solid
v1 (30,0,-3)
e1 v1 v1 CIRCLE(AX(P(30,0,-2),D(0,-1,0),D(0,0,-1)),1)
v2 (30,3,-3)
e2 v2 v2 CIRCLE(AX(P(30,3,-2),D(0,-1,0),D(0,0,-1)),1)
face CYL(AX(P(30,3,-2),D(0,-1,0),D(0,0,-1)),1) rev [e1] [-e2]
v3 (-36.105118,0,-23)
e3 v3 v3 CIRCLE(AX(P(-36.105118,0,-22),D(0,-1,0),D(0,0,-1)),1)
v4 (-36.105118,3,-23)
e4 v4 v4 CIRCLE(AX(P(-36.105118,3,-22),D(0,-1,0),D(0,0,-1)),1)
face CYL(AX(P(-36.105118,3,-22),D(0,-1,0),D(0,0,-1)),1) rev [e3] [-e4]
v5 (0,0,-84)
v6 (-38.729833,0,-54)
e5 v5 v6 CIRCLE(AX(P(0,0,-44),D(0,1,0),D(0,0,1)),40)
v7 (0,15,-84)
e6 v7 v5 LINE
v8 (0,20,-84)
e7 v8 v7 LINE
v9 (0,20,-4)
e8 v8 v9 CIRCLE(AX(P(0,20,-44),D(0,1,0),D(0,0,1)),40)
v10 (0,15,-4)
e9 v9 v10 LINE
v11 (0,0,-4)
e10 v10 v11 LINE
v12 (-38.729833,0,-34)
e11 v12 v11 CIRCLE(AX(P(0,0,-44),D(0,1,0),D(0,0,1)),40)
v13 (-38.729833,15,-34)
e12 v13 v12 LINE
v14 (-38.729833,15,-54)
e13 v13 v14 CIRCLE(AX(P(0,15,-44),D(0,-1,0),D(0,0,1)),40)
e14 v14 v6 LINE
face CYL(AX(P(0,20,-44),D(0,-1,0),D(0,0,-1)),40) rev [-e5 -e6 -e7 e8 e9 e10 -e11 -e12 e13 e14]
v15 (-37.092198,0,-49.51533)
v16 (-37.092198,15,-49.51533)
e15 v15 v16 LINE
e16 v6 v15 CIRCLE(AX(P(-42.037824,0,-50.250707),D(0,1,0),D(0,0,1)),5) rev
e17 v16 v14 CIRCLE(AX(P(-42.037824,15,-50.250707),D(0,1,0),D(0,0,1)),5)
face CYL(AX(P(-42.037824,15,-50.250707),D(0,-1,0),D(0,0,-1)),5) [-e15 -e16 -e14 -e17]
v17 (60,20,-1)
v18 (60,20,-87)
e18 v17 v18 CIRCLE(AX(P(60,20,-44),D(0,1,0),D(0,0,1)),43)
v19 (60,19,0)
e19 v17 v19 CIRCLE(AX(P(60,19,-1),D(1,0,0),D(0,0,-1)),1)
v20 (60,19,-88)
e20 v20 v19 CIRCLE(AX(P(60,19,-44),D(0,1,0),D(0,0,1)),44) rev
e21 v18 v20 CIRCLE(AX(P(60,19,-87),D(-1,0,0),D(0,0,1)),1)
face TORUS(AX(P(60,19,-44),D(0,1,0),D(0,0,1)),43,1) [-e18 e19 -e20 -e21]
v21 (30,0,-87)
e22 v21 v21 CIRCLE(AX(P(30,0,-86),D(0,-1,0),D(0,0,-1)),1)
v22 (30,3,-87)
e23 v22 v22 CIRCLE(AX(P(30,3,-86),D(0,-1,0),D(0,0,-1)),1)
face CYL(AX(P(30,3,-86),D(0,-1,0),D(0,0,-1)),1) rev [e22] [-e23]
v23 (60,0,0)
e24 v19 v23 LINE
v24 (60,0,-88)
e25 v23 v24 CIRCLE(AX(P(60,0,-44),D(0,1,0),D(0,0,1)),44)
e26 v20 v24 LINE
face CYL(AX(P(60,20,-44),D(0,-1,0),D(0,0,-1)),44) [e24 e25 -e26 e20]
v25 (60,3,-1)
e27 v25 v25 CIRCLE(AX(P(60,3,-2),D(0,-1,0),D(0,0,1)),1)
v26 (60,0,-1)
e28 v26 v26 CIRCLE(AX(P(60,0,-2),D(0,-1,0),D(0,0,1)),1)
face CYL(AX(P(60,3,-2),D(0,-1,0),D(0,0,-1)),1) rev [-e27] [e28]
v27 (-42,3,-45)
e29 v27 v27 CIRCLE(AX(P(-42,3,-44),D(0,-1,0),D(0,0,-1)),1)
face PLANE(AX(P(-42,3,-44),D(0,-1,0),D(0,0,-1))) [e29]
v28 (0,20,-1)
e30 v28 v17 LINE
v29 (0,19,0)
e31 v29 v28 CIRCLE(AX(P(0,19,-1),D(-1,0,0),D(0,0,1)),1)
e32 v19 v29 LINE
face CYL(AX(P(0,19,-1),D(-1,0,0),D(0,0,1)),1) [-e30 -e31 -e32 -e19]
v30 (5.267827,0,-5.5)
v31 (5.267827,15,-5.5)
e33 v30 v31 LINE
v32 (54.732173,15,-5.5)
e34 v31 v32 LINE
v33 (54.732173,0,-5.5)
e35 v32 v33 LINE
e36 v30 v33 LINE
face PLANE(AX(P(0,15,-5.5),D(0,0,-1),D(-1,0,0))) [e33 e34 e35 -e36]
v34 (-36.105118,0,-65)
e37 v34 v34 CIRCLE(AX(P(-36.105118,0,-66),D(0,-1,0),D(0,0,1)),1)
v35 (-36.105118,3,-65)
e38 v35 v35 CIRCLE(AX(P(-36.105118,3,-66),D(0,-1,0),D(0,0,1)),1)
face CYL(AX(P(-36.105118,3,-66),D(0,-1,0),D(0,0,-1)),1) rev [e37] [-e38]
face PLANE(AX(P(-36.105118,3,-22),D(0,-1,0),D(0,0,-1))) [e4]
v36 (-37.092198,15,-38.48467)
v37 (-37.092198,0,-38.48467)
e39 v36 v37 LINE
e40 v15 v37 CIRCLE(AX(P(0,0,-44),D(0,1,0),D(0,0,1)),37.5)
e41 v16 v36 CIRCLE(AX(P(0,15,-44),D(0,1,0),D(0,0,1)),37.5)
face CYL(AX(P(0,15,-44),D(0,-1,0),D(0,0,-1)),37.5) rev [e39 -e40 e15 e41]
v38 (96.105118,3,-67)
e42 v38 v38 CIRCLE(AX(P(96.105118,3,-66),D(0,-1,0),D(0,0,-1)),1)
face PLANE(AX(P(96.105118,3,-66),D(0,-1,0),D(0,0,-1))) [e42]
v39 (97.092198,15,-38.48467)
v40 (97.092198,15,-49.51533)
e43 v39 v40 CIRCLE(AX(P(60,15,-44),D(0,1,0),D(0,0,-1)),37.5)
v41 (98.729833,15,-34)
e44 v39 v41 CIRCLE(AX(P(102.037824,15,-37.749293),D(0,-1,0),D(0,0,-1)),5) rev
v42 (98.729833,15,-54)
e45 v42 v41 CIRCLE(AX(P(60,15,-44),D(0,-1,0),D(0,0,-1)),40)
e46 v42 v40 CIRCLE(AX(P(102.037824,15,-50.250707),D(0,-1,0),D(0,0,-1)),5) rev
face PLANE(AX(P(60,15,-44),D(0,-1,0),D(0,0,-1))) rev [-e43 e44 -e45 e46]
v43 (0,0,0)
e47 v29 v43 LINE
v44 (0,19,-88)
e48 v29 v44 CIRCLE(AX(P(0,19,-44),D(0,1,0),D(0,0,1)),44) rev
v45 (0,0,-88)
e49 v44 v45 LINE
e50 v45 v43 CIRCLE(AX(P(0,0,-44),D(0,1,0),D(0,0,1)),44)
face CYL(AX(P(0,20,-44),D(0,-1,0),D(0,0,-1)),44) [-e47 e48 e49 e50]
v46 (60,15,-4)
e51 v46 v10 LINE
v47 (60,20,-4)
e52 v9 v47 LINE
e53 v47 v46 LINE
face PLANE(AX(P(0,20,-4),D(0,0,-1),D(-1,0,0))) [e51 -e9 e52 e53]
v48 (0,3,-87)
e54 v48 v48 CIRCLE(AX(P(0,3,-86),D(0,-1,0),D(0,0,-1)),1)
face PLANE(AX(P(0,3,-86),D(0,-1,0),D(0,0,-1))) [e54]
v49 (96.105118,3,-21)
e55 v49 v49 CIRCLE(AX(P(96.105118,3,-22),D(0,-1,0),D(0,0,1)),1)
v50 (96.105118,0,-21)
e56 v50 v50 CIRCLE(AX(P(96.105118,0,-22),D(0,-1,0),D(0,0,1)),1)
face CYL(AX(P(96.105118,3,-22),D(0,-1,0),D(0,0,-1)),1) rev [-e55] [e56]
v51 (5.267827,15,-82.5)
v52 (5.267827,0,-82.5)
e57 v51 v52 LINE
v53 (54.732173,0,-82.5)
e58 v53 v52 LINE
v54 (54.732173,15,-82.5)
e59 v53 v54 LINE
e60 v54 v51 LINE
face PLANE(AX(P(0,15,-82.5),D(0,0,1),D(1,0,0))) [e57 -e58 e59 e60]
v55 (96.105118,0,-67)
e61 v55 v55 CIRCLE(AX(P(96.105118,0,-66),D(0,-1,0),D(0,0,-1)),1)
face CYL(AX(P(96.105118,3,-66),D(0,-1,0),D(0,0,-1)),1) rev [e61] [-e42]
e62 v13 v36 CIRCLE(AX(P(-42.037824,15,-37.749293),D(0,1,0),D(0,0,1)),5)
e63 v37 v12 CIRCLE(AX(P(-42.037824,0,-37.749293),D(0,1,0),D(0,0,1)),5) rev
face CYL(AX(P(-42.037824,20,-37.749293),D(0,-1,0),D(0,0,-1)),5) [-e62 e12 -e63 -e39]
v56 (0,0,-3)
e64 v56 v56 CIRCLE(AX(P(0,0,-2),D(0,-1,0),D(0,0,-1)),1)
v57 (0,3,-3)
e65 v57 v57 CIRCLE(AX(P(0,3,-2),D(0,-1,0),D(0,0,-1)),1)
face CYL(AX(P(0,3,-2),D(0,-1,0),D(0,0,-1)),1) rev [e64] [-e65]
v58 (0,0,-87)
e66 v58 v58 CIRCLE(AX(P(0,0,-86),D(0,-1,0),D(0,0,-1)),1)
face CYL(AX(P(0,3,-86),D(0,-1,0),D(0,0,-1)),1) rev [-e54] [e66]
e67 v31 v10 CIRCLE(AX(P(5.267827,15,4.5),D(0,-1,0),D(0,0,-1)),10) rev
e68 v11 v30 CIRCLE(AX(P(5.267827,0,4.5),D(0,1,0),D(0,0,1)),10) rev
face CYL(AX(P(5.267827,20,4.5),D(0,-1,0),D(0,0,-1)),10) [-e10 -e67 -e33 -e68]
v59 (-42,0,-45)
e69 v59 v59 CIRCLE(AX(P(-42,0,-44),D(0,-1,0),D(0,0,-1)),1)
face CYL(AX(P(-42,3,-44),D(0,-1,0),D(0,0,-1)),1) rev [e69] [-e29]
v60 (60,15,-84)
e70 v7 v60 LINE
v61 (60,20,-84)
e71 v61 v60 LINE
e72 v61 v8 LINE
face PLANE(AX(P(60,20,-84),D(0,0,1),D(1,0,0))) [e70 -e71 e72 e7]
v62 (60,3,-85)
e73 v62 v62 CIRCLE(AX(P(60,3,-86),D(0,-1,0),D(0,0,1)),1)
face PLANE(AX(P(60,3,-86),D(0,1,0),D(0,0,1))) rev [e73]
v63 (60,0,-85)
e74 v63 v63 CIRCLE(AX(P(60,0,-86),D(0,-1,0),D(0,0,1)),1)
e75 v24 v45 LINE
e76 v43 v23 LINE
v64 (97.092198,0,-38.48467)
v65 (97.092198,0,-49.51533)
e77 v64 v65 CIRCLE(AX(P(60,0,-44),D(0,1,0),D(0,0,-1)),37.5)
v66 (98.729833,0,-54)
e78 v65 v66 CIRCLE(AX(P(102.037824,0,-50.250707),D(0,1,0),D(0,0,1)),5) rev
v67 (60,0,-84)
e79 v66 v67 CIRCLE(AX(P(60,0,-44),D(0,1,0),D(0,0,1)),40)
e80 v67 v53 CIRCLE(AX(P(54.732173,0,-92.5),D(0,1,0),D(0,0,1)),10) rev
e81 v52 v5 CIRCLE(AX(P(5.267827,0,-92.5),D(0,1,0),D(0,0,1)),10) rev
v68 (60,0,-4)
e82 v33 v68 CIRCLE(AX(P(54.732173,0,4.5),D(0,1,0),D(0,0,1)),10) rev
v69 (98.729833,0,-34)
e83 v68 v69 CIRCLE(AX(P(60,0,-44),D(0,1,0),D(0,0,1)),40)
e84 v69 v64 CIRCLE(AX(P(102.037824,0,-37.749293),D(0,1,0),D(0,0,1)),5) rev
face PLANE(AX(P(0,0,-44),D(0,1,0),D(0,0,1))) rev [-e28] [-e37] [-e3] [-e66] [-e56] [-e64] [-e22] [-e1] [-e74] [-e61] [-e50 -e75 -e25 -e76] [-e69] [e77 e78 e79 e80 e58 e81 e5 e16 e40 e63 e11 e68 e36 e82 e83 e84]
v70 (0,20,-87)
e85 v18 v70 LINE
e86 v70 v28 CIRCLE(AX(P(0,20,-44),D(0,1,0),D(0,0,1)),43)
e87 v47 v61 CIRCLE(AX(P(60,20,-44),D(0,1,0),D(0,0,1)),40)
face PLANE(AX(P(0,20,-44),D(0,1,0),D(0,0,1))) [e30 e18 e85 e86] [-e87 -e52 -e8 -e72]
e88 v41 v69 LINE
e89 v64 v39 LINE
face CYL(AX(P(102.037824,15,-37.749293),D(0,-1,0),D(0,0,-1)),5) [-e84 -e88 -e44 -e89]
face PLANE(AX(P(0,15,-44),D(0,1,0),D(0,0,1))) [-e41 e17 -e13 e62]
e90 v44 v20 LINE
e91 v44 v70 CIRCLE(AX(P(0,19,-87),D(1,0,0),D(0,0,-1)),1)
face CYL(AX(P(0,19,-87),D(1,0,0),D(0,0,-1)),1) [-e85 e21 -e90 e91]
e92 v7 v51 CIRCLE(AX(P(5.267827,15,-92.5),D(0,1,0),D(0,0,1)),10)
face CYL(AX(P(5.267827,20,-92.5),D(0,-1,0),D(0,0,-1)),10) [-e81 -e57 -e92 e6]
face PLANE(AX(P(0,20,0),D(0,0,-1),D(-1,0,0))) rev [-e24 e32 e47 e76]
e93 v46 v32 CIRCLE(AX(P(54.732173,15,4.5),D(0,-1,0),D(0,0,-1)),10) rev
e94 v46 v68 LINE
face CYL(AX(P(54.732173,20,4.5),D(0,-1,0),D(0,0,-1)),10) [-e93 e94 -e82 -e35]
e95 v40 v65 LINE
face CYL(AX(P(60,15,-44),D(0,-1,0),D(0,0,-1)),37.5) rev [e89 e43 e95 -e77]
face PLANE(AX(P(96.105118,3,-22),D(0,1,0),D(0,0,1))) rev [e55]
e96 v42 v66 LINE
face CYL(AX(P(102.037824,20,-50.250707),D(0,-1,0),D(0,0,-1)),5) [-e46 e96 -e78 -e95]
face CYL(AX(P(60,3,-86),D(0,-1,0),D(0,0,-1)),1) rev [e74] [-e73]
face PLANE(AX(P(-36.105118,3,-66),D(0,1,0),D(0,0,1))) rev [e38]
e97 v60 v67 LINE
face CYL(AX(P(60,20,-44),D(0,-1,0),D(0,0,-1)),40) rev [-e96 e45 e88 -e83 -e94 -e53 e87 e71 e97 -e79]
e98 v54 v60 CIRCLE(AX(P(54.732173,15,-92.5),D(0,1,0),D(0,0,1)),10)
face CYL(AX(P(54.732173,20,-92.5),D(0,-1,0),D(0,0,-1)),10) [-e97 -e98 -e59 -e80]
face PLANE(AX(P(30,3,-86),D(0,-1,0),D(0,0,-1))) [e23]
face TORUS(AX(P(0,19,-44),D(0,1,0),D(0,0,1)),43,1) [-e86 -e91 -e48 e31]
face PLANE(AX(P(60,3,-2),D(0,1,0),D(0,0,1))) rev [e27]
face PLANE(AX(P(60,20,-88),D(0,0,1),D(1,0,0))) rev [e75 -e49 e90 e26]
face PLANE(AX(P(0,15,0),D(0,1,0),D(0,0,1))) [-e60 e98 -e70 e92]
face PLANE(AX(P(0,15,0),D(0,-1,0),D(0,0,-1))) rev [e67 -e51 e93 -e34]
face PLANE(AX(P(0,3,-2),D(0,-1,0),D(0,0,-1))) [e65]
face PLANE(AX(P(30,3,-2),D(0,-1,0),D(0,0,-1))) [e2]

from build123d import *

# Parameters (mm, degrees)
BOSS_EXTRUDE1_DEPTH = 20
SHELL1_T            = -4
SKETCH3_W           = 60
SKETCH3_H           = 1.5
BOSS_EXTRUDE2_DEPTH = 15
BOSS_EXTRUDE3_DEPTH = 15
FILLET2_R           = 10
BOSS_EXTRUDE5_DEPTH = 15
FILLET5_R           = 5
FILLET6_R           = 1
SKETCH7_R           = 1
CUT_EXTRUDE1_DEPTH  = 3


with BuildPart() as part:
    # Sketch1 → Boss-Extrude1 (new body)
    with BuildSketch(Plane(origin=(0, 0, 0), x_dir=(1, 0, 0), z_dir=(0, 1, 0))):
        with BuildLine():
            Line((0, 0), (60, 0))
            ThreePointArc((60, 0), (104, 44), (60, 88))
            Line((60, 88), (0, 88))
            ThreePointArc((0, 88), (-44, 44), (0, 0))
        make_face()
    extrude(amount=BOSS_EXTRUDE1_DEPTH)

    # Shell1
    shell1_openings = [part.faces().sort_by_distance(p)[0] for p in [
        (30, 20, -44),
        (30, 0, -44),
    ]]
    offset(amount=SHELL1_T, openings=shell1_openings, kind=Kind.INTERSECTION)

    # Sketch3 → Boss-Extrude2 (add)
    with BuildSketch(Plane.XZ):
        with Locations((30, -4.75)):
            Rectangle(SKETCH3_W, SKETCH3_H)
    extrude(amount=-BOSS_EXTRUDE2_DEPTH)

    # Sketch5 → Boss-Extrude3 (add)
    with BuildSketch(Plane.XZ):
        Polygon((0, -84), (0, -82.5), (60.003782522, -82.5), (60, -84), align=None)
    extrude(amount=-BOSS_EXTRUDE3_DEPTH)

    # Fillet2
    # the kernel refuses this fillet: 10 mm, written as the material it takes off along each edge
    with BuildSketch(Plane(origin=(60, -13.169567191, -5.5), x_dir=(0, 0, 1), z_dir=(0, 1, 0)), Plane(origin=(0, -13.169567191, -82.5), x_dir=(0, 0, -1), z_dir=(0, 1, 0))) as fillet2_piece_1:
        with BuildLine():
            CenterArc((10, -5.267826876), FILLET2_R, 148.211669383, 31.788330617)
            Line((0, -5.267826876), (-0.2, -5.267826876))
            Line((-0.2, -5.267826876), (-0.2, 0))
            Line((-0.2, 0), (0, 0.2))
            ThreePointArc((0, 0.2), (0.75, 0.2), (1.33, 0.105356538))
            Line((1.33, 0.105356538), (1.5, 0))
        make_face()
    extrude(amount=41.339134382, mode=Mode.SUBTRACT)
    with BuildSketch(Plane(origin=(60.003782522, -13.179023495, -82.5), x_dir=(-1, 0, 0), z_dir=(0, 1, 0))) as fillet2_piece_2:
        with BuildLine():
            CenterArc((5.271609398, -10), FILLET2_R, 90, 31.788330617)
            Line((0.003782522, -1.5), (-0.101574016, -1.33))
            ThreePointArc((-0.101574016, -1.33), (-0.198108103, -0.750504335), (-0.199999364, -0.000504335))
            Line((-0.199999364, -0.000504335), (0, 0.2))
            Line((0, 0.2), (5.271609398, 0.2))
            Line((5.271609398, 0.2), (5.271609398, 0))
        make_face()
    extrude(amount=41.358046991, mode=Mode.SUBTRACT)
    with BuildSketch(Plane(origin=(0, -13.169567191, -5.5), x_dir=(1, 0, 0), z_dir=(0, 1, 0))) as fillet2_piece_3:
        with BuildLine():
            CenterArc((5.267826876, -10), FILLET2_R, 90, 31.788330617)
            Line((0, -1.5), (-0.105356538, -1.33))
            ThreePointArc((-0.105356538, -1.33), (-0.2, -0.75), (-0.2, 0))
            Line((-0.2, 0), (0, 0.2))
            Line((0, 0.2), (5.267826876, 0.2))
            Line((5.267826876, 0.2), (5.267826876, 0))
        make_face()
    extrude(amount=41.339134382, mode=Mode.SUBTRACT)

    # Sketch8 → Boss-Extrude5 (add)
    with BuildSketch(Plane.XZ):
        with BuildLine():
            Line((96.142080737, -34), (98.729833462, -34))
            ThreePointArc((98.729833462, -34), (100, -44), (98.729833462, -54))
            Line((98.729833462, -54), (96.142080737, -54))
            ThreePointArc((96.142080737, -54), (97.5, -44), (96.142080737, -34))
        make_face()
        with BuildLine():
            Line((-36.142080737, -54), (-38.729833462, -54))
            ThreePointArc((-38.729833462, -54), (-40, -44), (-38.729833462, -34))
            Line((-38.729833462, -34), (-36.142080737, -34))
            ThreePointArc((-36.142080737, -34), (-37.5, -44), (-36.142080737, -54))
        make_face()
    extrude(amount=-BOSS_EXTRUDE5_DEPTH)

    # Fillet5
    # the kernel refuses this fillet: 5 mm, written as the material it takes off along each edge
    with BuildSketch(Plane(origin=(96.142080737, -11.460527233, -34), x_dir=(1, 0, 0), z_dir=(0, 1, 0)), Plane(origin=(-36.142080737, -11.460527233, -54), x_dir=(-1, 0, 0), z_dir=(0, 1, 0))) as fillet5_piece_1:
        with BuildLine():
            CenterArc((5.895743435, 3.749292929), FILLET5_R, 171.542516957, 57.035612676)
            Line((0.950117062, 4.484670231), (0.851204534, 4.499377777))
            ThreePointArc((0.851204534, 4.499377777), (0.445822951, 2.248528932), (-0.096378882, 0.026666667))
            Line((-0.096378882, 0.026666667), (0, -0.1))
            ThreePointArc((0, -0.1), (1.293876363, -0.1), (2.521592911, -0.074985859))
            Line((2.521592911, -0.074985859), (2.587752725, 0))
        make_face()
    extrude(amount=37.921054465, mode=Mode.SUBTRACT)
    with BuildSketch(Plane(origin=(96.142080737, -11.460527233, -54), x_dir=(1, 0, 0), z_dir=(0, 1, 0)), Plane(origin=(-36.142080737, -11.460527233, -34), x_dir=(-1, 0, 0), z_dir=(0, 1, 0))) as fillet5_piece_2:
        with BuildLine():
            CenterArc((5.895743435, -3.749292929), FILLET5_R, 131.421870366, 57.035612676)
            Line((0.950117062, -4.484670231), (0.851204534, -4.499377777))
            ThreePointArc((0.851204534, -4.499377777), (0.445822951, -2.248528932), (-0.096378882, -0.026666667))
            Line((-0.096378882, -0.026666667), (0, 0.1))
            ThreePointArc((0, 0.1), (1.293876363, 0.1), (2.521592911, 0.074985859))
            Line((2.521592911, 0.074985859), (2.587752725, 0))
        make_face()
    extrude(amount=37.921054465, mode=Mode.SUBTRACT)

    # Fillet6
    fillet6_edges = [part.edges().sort_by_distance(p)[0] for p in [
        (104, 20, -44),
        (30, 20, -88),
        (-44, 20, -44),
        (30, 20, 0),
    ]]
    fillet(fillet6_edges, radius=FILLET6_R)

    # Sketch7 → Cut-Extrude1 (cut)
    with BuildSketch(Plane.XZ):
        with Locations(Location((-42, -44, 0), (0, 0, 270))):
            Circle(SKETCH7_R)
        with Locations(Location((-36.105117767, -22, 0), (0, 0, 270))):
            Circle(SKETCH7_R)
        with Locations(Location((-36.105117767, -66, 0), (0, 0, 90))):
            Circle(SKETCH7_R)
        with Locations(Location((0, -2, 0), (0, 0, 270))):
            Circle(SKETCH7_R)
        with Locations(Location((30, -2, 0), (0, 0, 270))):
            Circle(SKETCH7_R)
        with Locations(Location((0, -86, 0), (0, 0, 270))):
            Circle(SKETCH7_R)
        with Locations(Location((30, -86, 0), (0, 0, 270))):
            Circle(SKETCH7_R)
        with Locations(Location((96.105117767, -22, 0), (0, 0, 90))):
            Circle(SKETCH7_R)
        with Locations(Location((96.105117767, -66, 0), (0, 0, 270))):
            Circle(SKETCH7_R)
        with Locations(Location((60, -86, 0), (0, 0, 90))):
            Circle(SKETCH7_R)
        with Locations(Location((60, -2, 0), (0, 0, 90))):
            Circle(SKETCH7_R)
    extrude(amount=-CUT_EXTRUDE1_DEPTH, mode=Mode.SUBTRACT)


solid = part.part
